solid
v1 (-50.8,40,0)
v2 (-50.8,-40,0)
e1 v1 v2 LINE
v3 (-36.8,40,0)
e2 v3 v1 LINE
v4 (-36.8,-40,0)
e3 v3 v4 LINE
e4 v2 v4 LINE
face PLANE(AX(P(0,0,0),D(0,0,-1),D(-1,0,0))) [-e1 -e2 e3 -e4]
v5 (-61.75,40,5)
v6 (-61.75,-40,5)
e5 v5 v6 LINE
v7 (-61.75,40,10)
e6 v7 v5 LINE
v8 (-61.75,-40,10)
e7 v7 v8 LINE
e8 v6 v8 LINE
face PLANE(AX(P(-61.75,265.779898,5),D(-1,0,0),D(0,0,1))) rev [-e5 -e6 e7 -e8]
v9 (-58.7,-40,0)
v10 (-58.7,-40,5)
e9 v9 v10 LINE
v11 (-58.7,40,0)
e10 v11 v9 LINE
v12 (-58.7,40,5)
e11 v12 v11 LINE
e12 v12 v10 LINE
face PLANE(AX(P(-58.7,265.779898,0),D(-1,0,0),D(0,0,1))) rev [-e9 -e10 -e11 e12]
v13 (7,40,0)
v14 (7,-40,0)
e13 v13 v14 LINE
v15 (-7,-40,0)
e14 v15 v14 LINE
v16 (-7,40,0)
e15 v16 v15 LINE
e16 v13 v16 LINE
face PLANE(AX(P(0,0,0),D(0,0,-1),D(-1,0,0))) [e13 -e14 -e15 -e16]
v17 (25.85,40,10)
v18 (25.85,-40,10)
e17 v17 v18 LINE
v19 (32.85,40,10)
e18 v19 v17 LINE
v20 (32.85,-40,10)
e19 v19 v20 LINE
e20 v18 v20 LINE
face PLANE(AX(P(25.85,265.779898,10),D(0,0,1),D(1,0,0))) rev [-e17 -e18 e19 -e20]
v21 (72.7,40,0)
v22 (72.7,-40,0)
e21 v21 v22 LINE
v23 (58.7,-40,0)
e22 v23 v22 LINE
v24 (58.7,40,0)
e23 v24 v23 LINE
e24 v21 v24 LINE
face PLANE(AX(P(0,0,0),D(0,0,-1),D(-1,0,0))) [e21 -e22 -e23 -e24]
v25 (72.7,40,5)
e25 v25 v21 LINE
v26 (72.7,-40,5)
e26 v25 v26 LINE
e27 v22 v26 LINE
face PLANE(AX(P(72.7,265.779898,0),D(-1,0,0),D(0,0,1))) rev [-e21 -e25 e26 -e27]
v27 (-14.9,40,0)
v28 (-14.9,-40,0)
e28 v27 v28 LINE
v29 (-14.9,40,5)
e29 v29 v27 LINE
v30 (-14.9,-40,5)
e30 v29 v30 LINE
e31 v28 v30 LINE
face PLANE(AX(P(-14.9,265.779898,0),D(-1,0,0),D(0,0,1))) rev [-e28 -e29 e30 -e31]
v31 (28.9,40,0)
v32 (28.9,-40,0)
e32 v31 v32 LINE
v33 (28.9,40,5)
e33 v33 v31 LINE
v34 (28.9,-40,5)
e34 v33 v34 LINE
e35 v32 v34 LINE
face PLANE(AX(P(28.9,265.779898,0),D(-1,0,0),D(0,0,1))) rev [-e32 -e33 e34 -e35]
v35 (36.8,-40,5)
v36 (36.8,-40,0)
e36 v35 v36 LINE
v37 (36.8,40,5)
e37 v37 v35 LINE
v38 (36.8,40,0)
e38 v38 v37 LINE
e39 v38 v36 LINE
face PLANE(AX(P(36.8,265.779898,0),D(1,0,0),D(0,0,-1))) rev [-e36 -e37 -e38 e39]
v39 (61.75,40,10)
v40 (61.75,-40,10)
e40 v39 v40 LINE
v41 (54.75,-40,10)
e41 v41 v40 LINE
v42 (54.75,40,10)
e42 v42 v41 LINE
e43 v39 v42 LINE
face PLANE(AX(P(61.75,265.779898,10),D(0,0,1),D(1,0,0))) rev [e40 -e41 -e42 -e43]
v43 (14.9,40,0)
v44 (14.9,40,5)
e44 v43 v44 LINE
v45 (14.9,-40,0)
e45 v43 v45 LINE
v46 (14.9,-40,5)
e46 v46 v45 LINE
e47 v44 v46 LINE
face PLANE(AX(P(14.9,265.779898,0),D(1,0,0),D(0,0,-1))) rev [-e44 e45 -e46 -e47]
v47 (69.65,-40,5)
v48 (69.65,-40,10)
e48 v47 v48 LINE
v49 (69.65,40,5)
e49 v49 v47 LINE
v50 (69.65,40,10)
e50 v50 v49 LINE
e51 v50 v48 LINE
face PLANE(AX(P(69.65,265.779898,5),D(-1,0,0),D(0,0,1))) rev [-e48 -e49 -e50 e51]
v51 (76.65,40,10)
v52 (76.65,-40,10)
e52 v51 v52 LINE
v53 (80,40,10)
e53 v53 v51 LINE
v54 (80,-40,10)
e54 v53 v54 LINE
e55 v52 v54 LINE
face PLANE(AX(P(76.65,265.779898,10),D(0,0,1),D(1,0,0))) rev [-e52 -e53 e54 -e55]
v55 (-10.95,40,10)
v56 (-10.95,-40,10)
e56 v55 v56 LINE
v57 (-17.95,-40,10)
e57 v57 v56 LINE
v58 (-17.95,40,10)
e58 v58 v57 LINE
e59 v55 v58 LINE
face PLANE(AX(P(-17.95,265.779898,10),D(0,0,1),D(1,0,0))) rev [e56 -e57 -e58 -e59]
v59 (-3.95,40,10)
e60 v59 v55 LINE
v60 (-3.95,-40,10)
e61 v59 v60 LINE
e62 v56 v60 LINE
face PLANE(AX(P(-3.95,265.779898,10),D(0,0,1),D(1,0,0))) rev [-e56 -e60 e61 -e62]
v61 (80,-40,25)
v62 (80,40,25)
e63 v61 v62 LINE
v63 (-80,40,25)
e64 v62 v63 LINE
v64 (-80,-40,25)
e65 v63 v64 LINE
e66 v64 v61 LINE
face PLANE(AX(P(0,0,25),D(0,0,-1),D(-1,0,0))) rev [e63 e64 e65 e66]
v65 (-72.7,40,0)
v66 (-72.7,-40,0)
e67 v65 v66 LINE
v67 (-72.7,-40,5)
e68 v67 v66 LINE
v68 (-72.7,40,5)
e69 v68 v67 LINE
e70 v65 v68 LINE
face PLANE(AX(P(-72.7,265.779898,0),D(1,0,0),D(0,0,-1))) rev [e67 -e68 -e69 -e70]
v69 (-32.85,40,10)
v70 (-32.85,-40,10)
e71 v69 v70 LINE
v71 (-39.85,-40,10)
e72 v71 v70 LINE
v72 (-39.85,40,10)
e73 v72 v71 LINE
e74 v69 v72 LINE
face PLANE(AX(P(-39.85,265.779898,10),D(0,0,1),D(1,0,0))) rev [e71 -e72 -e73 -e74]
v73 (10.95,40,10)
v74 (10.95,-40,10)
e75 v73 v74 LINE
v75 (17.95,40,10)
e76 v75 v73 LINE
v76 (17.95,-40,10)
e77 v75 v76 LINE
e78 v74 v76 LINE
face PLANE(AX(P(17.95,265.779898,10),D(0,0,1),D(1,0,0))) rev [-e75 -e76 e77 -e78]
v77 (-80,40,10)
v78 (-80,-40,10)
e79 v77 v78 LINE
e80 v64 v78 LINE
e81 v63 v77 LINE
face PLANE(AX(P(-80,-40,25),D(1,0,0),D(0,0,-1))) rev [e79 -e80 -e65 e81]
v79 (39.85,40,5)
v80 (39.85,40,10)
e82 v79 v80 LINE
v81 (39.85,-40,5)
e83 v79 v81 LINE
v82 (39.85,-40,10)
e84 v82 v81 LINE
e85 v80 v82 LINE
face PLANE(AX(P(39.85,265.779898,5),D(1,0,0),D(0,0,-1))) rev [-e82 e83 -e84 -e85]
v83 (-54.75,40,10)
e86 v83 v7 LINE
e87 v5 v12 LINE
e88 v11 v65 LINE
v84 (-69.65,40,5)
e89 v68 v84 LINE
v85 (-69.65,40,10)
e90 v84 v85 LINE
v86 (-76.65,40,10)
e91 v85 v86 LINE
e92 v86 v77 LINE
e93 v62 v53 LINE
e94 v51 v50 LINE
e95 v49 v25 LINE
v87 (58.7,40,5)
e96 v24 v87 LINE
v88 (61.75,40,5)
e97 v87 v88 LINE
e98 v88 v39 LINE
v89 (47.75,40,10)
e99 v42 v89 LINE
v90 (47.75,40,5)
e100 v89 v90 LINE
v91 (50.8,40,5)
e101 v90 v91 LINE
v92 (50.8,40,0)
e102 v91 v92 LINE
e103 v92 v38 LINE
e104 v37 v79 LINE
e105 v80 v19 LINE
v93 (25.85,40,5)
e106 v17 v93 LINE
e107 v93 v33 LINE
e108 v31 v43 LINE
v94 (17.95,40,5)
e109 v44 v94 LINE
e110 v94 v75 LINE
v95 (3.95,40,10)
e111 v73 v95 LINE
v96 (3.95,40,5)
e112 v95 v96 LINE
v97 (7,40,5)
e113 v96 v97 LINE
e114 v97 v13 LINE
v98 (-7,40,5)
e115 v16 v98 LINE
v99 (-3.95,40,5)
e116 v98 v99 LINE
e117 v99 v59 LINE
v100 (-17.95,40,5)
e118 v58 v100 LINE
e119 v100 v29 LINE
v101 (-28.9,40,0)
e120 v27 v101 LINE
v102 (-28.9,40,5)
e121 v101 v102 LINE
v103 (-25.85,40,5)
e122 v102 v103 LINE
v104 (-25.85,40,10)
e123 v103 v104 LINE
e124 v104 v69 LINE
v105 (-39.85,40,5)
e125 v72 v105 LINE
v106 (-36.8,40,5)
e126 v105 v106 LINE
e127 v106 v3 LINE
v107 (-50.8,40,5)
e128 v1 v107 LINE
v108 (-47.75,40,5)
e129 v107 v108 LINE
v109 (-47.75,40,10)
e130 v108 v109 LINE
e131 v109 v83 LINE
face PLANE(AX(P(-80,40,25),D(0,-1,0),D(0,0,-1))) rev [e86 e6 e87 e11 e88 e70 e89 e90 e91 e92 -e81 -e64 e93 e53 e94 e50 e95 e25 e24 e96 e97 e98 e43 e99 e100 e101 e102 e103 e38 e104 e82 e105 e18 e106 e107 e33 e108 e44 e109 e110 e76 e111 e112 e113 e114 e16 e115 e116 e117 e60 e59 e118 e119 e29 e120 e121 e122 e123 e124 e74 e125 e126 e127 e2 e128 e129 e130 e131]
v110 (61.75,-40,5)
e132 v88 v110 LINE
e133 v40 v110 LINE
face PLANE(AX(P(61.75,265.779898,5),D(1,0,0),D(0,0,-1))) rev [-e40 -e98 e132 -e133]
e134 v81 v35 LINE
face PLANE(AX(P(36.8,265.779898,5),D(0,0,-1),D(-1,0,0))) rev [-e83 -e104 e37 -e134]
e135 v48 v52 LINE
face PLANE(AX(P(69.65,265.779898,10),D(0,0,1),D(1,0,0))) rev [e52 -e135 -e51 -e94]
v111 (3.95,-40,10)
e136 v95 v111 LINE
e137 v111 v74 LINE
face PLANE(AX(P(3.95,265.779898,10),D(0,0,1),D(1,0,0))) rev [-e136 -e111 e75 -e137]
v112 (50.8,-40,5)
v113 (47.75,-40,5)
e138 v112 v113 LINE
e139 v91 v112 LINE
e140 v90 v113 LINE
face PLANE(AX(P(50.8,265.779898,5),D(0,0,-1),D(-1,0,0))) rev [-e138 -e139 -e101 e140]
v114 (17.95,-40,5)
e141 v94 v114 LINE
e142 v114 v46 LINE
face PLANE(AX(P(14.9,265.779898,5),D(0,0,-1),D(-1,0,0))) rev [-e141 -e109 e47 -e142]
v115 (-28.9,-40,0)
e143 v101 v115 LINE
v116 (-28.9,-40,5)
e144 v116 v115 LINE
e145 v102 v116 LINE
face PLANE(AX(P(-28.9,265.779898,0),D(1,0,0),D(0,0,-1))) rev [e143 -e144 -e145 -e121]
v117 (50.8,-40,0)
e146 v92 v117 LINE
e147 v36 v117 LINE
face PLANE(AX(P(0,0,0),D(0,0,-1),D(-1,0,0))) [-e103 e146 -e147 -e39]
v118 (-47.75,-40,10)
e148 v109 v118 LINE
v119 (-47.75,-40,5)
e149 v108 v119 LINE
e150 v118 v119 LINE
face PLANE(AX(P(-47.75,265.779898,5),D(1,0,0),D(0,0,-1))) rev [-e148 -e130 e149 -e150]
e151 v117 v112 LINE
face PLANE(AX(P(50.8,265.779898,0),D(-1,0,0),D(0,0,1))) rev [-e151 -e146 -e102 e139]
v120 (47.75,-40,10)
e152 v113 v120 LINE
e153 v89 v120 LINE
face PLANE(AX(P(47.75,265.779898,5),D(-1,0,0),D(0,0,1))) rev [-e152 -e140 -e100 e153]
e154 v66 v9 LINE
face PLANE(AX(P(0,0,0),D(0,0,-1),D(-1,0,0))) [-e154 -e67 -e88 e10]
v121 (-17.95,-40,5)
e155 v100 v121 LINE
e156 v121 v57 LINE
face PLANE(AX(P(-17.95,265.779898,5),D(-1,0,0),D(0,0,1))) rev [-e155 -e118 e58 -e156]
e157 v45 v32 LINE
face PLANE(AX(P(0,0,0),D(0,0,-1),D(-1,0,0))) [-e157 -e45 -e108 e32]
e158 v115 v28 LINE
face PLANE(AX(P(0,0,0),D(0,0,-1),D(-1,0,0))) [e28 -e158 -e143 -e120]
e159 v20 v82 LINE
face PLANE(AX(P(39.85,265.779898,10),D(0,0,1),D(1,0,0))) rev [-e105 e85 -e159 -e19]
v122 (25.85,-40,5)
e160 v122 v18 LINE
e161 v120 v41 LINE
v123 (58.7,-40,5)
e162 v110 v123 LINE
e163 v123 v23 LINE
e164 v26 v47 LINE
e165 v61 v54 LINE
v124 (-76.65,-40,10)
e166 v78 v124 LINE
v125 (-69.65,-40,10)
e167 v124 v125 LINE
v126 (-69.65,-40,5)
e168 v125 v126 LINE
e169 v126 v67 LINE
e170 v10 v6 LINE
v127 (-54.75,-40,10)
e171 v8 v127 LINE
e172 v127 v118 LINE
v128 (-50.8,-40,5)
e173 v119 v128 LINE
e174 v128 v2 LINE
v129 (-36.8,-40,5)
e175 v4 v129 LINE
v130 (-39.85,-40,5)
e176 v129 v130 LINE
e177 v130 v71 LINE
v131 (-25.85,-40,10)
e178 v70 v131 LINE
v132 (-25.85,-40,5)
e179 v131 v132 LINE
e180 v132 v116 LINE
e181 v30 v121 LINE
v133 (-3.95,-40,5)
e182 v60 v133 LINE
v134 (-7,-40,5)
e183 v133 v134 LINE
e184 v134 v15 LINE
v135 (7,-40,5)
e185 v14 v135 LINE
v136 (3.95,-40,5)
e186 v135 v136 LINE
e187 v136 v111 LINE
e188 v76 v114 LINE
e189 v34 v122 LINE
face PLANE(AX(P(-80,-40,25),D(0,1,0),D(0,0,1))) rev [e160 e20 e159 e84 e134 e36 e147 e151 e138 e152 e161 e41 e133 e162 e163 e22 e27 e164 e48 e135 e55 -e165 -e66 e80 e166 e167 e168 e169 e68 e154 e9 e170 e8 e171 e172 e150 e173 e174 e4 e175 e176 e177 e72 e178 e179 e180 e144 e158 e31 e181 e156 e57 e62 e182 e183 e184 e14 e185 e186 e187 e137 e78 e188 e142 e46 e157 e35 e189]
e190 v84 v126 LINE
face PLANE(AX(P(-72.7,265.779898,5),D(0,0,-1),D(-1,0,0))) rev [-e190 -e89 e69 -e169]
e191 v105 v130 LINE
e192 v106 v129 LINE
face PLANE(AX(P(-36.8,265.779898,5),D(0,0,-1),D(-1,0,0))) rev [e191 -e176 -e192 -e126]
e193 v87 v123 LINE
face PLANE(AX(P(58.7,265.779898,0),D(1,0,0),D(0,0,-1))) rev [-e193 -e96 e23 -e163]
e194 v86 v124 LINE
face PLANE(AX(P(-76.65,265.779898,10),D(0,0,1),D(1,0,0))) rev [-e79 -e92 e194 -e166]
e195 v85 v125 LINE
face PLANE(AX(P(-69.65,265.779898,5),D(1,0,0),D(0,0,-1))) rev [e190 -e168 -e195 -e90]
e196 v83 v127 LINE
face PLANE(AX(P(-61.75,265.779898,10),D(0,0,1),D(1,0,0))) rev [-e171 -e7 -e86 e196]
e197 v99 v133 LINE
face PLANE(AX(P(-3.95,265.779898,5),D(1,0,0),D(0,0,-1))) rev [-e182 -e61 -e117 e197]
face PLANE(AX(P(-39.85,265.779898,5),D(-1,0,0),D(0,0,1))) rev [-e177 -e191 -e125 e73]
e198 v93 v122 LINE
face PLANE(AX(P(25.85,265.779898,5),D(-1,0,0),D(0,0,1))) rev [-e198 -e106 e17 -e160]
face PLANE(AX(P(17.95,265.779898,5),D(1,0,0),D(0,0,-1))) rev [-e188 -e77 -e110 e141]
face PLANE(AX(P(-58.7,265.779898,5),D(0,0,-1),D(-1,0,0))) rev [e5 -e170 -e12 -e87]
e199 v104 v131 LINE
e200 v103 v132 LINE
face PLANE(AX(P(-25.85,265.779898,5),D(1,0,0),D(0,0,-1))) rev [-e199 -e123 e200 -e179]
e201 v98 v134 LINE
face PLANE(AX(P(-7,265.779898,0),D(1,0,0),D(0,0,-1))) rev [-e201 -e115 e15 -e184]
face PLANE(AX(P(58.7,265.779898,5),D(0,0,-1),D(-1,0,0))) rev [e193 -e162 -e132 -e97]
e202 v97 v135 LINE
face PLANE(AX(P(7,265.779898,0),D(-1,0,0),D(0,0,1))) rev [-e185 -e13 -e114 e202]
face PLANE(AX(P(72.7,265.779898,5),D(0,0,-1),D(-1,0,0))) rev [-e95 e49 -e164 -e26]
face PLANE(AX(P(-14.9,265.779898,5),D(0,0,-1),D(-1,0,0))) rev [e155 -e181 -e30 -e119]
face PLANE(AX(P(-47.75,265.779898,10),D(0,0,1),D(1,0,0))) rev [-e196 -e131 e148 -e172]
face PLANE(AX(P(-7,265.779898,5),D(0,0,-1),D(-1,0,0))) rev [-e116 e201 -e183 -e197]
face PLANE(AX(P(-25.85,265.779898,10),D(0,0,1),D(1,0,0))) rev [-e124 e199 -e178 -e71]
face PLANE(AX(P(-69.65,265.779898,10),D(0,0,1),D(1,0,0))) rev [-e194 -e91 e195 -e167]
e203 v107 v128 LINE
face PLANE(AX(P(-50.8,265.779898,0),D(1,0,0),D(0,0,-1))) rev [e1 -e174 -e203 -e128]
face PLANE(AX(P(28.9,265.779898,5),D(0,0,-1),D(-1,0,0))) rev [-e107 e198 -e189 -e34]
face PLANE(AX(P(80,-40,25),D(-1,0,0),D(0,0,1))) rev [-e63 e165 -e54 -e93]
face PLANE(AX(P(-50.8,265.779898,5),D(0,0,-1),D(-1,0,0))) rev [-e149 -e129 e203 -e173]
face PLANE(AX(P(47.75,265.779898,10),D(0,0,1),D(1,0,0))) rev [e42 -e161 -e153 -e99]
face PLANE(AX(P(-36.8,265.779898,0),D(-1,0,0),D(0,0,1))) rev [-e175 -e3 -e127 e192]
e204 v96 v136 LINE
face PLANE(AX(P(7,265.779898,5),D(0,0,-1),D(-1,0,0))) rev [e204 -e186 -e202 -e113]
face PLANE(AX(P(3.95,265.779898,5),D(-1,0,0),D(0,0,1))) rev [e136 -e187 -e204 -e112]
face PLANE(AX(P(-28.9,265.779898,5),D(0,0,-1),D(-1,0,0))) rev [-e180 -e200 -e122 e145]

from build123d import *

# Parameters (mm, degrees)
SKETCH1_W           = 160
SKETCH1_H           = 80
BOSS_EXTRUDE1_DEPTH = 25
CUT_EXTRUDE1_START  = -80
CUT_EXTRUDE1_DEPTH  = 80


# Read off the part's stored shape, not the designer's step: Cut-Extrude1
with BuildPart() as part:
    # Sketch1 → Boss-Extrude1 (new body)
    with BuildSketch(Plane.XY):
        Rectangle(SKETCH1_W, SKETCH1_H)
    extrude(amount=BOSS_EXTRUDE1_DEPTH)

    # Cut-Extrude1 outline → Cut-Extrude1 (cut)
    with BuildSketch(Plane(origin=(0, 40, 0), x_dir=(1, 0, 0), z_dir=(0, 1, 0)).offset(CUT_EXTRUDE1_START)):
        Polygon((-80, 0), (-80, -10), (-69.65, -10), (-69.65, -5), (-72.7, -5), (-72.7, 0), align=None)
        Polygon((80, 0), (72.7, 0), (72.7, -5), (69.65, -5), (69.65, -10), (80, -10), align=None)
        Polygon((58.7, 0), (50.8, 0), (50.8, -5), (47.75, -5), (47.75, -10), (61.75, -10), (61.75, -5), (58.7, -5), align=None)
        Polygon((36.8, 0), (28.9, 0), (28.9, -5), (25.85, -5), (25.85, -10), (39.85, -10), (39.85, -5), (36.8, -5), align=None)
        Polygon((14.9, 0), (7, 0), (7, -5), (3.95, -5), (3.95, -10), (17.95, -10), (17.95, -5), (14.9, -5), align=None)
        Polygon((-7, 0), (-14.9, 0), (-14.9, -5), (-17.95, -5), (-17.95, -10), (-3.95, -10), (-3.95, -5), (-7, -5), align=None)
        Polygon((-28.9, 0), (-36.8, 0), (-36.8, -5), (-39.85, -5), (-39.85, -10), (-25.85, -10), (-25.85, -5), (-28.9, -5), align=None)
        Polygon((-50.8, 0), (-58.7, 0), (-58.7, -5), (-61.75, -5), (-61.75, -10), (-47.75, -10), (-47.75, -5), (-50.8, -5), align=None)
    extrude(amount=CUT_EXTRUDE1_DEPTH, mode=Mode.SUBTRACT)


solid = part.part
